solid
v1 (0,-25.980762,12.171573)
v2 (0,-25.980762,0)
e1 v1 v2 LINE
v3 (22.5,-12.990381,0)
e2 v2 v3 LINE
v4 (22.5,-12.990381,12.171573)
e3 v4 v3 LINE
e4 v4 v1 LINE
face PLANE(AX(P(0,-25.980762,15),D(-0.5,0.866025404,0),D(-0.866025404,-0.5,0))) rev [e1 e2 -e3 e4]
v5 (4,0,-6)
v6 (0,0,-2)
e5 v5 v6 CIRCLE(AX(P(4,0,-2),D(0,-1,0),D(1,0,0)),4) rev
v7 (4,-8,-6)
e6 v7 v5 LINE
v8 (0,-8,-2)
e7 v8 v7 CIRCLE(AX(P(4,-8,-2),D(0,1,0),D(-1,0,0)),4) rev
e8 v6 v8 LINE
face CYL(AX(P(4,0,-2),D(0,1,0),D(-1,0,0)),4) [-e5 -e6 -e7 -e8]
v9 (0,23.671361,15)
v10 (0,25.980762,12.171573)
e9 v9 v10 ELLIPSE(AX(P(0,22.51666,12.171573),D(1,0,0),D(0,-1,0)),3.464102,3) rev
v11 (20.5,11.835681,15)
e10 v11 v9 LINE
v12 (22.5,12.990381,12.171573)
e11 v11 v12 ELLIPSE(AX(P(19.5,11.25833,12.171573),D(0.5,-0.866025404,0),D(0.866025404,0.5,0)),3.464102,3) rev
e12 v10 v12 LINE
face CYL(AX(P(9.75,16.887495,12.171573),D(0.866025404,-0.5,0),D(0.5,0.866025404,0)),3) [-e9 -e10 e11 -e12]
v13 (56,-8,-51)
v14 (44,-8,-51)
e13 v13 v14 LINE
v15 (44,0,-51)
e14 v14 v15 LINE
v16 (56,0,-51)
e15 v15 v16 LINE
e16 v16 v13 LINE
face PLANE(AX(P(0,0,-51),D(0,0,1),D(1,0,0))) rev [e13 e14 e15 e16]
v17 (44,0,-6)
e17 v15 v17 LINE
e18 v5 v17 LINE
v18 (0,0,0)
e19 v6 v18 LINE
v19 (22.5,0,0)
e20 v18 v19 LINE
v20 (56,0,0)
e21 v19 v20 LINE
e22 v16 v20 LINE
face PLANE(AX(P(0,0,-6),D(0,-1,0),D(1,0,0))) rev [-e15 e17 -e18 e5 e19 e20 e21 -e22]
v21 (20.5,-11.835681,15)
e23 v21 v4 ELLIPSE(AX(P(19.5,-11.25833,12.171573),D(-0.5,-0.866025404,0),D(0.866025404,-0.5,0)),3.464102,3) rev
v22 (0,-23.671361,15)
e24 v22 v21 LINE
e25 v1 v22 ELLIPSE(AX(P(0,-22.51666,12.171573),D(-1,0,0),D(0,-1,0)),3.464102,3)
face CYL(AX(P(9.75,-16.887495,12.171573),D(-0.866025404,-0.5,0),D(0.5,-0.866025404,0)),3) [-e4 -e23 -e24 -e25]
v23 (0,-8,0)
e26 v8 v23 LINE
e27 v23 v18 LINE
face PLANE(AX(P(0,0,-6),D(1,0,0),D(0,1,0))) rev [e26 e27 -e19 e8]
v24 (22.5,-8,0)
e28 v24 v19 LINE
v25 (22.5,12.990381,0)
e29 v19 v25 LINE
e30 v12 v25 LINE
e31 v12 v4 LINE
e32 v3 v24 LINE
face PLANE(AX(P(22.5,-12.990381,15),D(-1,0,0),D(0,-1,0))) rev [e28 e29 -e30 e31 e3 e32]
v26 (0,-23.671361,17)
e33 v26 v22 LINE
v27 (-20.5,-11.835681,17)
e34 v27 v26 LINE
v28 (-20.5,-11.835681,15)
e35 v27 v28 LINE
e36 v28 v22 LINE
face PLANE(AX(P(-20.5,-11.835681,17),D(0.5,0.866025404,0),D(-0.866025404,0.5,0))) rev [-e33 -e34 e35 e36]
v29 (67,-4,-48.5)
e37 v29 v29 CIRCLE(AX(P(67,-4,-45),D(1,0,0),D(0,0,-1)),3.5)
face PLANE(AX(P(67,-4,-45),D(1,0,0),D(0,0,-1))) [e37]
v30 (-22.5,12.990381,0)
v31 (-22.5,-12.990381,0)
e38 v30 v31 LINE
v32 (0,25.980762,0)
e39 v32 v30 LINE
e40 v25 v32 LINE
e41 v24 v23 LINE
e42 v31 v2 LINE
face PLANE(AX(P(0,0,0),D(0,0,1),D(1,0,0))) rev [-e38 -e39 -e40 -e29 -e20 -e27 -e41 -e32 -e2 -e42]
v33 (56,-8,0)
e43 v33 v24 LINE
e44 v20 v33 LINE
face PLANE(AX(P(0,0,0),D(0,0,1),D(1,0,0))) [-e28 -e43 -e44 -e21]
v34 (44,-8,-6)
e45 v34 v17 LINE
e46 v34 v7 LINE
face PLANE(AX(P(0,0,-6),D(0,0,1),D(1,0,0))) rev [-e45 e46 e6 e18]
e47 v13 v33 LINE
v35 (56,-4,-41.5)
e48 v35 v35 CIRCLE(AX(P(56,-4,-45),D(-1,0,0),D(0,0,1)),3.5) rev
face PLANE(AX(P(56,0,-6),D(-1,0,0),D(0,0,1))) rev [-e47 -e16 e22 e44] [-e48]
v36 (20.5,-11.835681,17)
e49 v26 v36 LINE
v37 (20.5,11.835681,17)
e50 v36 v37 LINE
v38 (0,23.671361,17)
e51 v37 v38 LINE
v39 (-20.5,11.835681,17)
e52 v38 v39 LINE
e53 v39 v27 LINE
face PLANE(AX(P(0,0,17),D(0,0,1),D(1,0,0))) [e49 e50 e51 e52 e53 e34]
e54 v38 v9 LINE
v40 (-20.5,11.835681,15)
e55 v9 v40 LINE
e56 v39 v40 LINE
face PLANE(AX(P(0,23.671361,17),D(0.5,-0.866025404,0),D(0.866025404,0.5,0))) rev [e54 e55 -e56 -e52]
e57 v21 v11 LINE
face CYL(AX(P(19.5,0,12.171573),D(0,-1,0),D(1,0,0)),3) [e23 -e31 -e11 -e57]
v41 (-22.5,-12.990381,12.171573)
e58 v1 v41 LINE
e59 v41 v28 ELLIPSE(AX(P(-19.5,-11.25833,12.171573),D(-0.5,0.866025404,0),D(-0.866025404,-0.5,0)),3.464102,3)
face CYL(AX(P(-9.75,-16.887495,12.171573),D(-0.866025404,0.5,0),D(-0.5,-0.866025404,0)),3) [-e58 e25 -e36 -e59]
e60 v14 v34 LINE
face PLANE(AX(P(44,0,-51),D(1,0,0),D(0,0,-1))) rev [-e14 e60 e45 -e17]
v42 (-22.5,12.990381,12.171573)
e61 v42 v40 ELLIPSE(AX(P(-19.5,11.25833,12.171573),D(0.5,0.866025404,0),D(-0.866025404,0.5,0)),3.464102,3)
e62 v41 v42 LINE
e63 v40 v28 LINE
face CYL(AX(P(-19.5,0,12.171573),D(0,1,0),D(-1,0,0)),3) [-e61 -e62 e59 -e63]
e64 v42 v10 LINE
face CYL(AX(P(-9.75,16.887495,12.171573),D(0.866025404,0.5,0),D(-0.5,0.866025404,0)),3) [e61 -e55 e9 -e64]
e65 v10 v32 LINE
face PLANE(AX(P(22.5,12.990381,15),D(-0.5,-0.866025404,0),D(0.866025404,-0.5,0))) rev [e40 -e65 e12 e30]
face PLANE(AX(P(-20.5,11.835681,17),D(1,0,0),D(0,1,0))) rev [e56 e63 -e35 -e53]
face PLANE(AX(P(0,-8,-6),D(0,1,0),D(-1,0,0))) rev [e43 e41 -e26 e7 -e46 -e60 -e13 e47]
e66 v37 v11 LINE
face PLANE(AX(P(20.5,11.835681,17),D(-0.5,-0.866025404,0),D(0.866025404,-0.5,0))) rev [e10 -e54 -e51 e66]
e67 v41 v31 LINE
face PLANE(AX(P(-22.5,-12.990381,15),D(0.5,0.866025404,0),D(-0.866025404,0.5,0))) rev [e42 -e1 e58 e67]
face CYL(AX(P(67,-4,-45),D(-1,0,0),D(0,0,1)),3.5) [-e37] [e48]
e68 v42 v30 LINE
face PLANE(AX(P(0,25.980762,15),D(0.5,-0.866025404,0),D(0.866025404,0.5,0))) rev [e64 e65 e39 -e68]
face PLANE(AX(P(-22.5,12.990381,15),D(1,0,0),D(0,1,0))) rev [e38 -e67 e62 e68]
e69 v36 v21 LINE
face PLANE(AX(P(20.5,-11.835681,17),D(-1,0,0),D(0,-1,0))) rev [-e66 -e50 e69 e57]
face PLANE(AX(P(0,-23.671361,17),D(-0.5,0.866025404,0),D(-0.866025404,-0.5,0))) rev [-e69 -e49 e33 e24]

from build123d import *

# Parameters (mm, degrees)
BOSS_EXTRUDE1_DEPTH = 15
BOSS_EXTRUDE2_DEPTH = 2
FILLET1_R           = 3
SKETCH3_W           = 56
SKETCH3_H           = 8
BOSS_EXTRUDE3_DEPTH = 6
SKETCH4_W           = 12
SKETCH4_H           = 8
BOSS_EXTRUDE4_DEPTH = 45
SKETCH5_R           = 3.5
BOSS_EXTRUDE5_DEPTH = 11
FILLET2_R           = 4


with BuildPart() as part:
    # Sketch1 → Boss-Extrude1 (new body)
    with BuildSketch(Plane.XY):
        Polygon((0, 25.980762114), (-22.5, 12.990381057), (-22.5, -12.990381057), (0, -25.980762114), (22.5, -12.990381057), (22.5, 12.990381057), align=None)
    extrude(amount=BOSS_EXTRUDE1_DEPTH)

    # Sketch2 → Boss-Extrude2 (add)
    with BuildSketch(Plane.XY.offset(15)):
        Polygon((20.5, 11.835680518), (0, 23.671361037), (-20.5, 11.835680518), (-20.5, -11.835680518), (0, -23.671361037), (20.5, -11.835680518), align=None)
    extrude(amount=BOSS_EXTRUDE2_DEPTH)

    # Fillet1
    # the kernel refuses this fillet: 3 mm, written as the material it takes off along each edge
    with BuildSketch(Plane(origin=(-22.5, 20.061448869, 15), x_dir=(0, 0, -1), z_dir=(0, -1, 0)), Plane(origin=(28.623724357, 9.454847151, 15), x_dir=(0, 0, -1), z_dir=(-0.8660254037844388, 0.4999999999999997, 0)), Plane(origin=(6.123724357, 29.516296019, 15), x_dir=(0, 0, -1), z_dir=(-0.8660254037844386, -0.5000000000000003, 0))) as fillet1_piece_1:
        with BuildLine():
            CenterArc((2.828427125, 3), FILLET1_R, 199.471220634, 70.528779366)
            Line((0, 2), (-0.056568542, 1.98))
            ThreePointArc((-0.056568542, 1.98), (-0.06, 1), (-0.06, 0))
            Line((-0.06, 0), (0, -0.06))
            Line((0, -0.06), (2.828427125, -0.06))
            Line((2.828427125, -0.06), (2.828427125, 0))
        make_face()
    extrude(amount=40.122897737, mode=Mode.SUBTRACT)
    with BuildSketch(Plane(origin=(-28.623724357, -9.454847151, 15), x_dir=(0.5000000000000002, 0.8660254037844386, 0), z_dir=(0.8660254037844386, -0.5000000000000002, 0)), Plane(origin=(-6.123724357, -29.516296019, 15), x_dir=(-0.5000000000000003, 0.8660254037844386, 0), z_dir=(0.8660254037844385, 0.5000000000000003, 0)), Plane(origin=(22.5, -20.061448869, 15), x_dir=(-1, 0, 0), z_dir=(0, 1, 0))) as fillet1_piece_2:
        with BuildLine():
            CenterArc((3, -2.828427125), FILLET1_R, 109.471220634, 70.528779366)
            Line((0, -2.828427125), (-0.06, -2.828427125))
            Line((-0.06, -2.828427125), (-0.06, 0))
            Line((-0.06, 0), (0, 0.06))
            ThreePointArc((0, 0.06), (1, 0.06), (1.98, 0.056568542))
            Line((1.98, 0.056568542), (2, 0))
        make_face()
    extrude(amount=40.122897737, mode=Mode.SUBTRACT)

    # Sketch3 → Boss-Extrude3 (add)
    with BuildSketch(Plane(origin=(0, 0, 0), x_dir=(-1, 0, 0), z_dir=(0, 0, -1))):
        with Locations((-28, -4)):
            Rectangle(SKETCH3_W, SKETCH3_H)
    extrude(amount=BOSS_EXTRUDE3_DEPTH)

    # Sketch4 → Boss-Extrude4 (add)
    with BuildSketch(Plane(origin=(0, 0, -6), x_dir=(-1, 0, 0), z_dir=(0, 0, -1))):
        with Locations((-50, -4)):
            Rectangle(SKETCH4_W, SKETCH4_H)
    extrude(amount=BOSS_EXTRUDE4_DEPTH)

    # Sketch5 → Boss-Extrude5 (add)
    with BuildSketch(Plane(origin=(56, 0, 0), x_dir=(0, 0, -1), z_dir=(1, 0, 0))):
        with Locations(Location((45, -4, 0), (0, 0, 180))):
            Circle(SKETCH5_R)
    extrude(amount=BOSS_EXTRUDE5_DEPTH)

    # Fillet2
    fillet2_edges = [part.edges().sort_by_distance(p)[0] for p in [
        (0, -4, -6),
    ]]
    fillet(fillet2_edges, radius=FILLET2_R)


solid = part.part
